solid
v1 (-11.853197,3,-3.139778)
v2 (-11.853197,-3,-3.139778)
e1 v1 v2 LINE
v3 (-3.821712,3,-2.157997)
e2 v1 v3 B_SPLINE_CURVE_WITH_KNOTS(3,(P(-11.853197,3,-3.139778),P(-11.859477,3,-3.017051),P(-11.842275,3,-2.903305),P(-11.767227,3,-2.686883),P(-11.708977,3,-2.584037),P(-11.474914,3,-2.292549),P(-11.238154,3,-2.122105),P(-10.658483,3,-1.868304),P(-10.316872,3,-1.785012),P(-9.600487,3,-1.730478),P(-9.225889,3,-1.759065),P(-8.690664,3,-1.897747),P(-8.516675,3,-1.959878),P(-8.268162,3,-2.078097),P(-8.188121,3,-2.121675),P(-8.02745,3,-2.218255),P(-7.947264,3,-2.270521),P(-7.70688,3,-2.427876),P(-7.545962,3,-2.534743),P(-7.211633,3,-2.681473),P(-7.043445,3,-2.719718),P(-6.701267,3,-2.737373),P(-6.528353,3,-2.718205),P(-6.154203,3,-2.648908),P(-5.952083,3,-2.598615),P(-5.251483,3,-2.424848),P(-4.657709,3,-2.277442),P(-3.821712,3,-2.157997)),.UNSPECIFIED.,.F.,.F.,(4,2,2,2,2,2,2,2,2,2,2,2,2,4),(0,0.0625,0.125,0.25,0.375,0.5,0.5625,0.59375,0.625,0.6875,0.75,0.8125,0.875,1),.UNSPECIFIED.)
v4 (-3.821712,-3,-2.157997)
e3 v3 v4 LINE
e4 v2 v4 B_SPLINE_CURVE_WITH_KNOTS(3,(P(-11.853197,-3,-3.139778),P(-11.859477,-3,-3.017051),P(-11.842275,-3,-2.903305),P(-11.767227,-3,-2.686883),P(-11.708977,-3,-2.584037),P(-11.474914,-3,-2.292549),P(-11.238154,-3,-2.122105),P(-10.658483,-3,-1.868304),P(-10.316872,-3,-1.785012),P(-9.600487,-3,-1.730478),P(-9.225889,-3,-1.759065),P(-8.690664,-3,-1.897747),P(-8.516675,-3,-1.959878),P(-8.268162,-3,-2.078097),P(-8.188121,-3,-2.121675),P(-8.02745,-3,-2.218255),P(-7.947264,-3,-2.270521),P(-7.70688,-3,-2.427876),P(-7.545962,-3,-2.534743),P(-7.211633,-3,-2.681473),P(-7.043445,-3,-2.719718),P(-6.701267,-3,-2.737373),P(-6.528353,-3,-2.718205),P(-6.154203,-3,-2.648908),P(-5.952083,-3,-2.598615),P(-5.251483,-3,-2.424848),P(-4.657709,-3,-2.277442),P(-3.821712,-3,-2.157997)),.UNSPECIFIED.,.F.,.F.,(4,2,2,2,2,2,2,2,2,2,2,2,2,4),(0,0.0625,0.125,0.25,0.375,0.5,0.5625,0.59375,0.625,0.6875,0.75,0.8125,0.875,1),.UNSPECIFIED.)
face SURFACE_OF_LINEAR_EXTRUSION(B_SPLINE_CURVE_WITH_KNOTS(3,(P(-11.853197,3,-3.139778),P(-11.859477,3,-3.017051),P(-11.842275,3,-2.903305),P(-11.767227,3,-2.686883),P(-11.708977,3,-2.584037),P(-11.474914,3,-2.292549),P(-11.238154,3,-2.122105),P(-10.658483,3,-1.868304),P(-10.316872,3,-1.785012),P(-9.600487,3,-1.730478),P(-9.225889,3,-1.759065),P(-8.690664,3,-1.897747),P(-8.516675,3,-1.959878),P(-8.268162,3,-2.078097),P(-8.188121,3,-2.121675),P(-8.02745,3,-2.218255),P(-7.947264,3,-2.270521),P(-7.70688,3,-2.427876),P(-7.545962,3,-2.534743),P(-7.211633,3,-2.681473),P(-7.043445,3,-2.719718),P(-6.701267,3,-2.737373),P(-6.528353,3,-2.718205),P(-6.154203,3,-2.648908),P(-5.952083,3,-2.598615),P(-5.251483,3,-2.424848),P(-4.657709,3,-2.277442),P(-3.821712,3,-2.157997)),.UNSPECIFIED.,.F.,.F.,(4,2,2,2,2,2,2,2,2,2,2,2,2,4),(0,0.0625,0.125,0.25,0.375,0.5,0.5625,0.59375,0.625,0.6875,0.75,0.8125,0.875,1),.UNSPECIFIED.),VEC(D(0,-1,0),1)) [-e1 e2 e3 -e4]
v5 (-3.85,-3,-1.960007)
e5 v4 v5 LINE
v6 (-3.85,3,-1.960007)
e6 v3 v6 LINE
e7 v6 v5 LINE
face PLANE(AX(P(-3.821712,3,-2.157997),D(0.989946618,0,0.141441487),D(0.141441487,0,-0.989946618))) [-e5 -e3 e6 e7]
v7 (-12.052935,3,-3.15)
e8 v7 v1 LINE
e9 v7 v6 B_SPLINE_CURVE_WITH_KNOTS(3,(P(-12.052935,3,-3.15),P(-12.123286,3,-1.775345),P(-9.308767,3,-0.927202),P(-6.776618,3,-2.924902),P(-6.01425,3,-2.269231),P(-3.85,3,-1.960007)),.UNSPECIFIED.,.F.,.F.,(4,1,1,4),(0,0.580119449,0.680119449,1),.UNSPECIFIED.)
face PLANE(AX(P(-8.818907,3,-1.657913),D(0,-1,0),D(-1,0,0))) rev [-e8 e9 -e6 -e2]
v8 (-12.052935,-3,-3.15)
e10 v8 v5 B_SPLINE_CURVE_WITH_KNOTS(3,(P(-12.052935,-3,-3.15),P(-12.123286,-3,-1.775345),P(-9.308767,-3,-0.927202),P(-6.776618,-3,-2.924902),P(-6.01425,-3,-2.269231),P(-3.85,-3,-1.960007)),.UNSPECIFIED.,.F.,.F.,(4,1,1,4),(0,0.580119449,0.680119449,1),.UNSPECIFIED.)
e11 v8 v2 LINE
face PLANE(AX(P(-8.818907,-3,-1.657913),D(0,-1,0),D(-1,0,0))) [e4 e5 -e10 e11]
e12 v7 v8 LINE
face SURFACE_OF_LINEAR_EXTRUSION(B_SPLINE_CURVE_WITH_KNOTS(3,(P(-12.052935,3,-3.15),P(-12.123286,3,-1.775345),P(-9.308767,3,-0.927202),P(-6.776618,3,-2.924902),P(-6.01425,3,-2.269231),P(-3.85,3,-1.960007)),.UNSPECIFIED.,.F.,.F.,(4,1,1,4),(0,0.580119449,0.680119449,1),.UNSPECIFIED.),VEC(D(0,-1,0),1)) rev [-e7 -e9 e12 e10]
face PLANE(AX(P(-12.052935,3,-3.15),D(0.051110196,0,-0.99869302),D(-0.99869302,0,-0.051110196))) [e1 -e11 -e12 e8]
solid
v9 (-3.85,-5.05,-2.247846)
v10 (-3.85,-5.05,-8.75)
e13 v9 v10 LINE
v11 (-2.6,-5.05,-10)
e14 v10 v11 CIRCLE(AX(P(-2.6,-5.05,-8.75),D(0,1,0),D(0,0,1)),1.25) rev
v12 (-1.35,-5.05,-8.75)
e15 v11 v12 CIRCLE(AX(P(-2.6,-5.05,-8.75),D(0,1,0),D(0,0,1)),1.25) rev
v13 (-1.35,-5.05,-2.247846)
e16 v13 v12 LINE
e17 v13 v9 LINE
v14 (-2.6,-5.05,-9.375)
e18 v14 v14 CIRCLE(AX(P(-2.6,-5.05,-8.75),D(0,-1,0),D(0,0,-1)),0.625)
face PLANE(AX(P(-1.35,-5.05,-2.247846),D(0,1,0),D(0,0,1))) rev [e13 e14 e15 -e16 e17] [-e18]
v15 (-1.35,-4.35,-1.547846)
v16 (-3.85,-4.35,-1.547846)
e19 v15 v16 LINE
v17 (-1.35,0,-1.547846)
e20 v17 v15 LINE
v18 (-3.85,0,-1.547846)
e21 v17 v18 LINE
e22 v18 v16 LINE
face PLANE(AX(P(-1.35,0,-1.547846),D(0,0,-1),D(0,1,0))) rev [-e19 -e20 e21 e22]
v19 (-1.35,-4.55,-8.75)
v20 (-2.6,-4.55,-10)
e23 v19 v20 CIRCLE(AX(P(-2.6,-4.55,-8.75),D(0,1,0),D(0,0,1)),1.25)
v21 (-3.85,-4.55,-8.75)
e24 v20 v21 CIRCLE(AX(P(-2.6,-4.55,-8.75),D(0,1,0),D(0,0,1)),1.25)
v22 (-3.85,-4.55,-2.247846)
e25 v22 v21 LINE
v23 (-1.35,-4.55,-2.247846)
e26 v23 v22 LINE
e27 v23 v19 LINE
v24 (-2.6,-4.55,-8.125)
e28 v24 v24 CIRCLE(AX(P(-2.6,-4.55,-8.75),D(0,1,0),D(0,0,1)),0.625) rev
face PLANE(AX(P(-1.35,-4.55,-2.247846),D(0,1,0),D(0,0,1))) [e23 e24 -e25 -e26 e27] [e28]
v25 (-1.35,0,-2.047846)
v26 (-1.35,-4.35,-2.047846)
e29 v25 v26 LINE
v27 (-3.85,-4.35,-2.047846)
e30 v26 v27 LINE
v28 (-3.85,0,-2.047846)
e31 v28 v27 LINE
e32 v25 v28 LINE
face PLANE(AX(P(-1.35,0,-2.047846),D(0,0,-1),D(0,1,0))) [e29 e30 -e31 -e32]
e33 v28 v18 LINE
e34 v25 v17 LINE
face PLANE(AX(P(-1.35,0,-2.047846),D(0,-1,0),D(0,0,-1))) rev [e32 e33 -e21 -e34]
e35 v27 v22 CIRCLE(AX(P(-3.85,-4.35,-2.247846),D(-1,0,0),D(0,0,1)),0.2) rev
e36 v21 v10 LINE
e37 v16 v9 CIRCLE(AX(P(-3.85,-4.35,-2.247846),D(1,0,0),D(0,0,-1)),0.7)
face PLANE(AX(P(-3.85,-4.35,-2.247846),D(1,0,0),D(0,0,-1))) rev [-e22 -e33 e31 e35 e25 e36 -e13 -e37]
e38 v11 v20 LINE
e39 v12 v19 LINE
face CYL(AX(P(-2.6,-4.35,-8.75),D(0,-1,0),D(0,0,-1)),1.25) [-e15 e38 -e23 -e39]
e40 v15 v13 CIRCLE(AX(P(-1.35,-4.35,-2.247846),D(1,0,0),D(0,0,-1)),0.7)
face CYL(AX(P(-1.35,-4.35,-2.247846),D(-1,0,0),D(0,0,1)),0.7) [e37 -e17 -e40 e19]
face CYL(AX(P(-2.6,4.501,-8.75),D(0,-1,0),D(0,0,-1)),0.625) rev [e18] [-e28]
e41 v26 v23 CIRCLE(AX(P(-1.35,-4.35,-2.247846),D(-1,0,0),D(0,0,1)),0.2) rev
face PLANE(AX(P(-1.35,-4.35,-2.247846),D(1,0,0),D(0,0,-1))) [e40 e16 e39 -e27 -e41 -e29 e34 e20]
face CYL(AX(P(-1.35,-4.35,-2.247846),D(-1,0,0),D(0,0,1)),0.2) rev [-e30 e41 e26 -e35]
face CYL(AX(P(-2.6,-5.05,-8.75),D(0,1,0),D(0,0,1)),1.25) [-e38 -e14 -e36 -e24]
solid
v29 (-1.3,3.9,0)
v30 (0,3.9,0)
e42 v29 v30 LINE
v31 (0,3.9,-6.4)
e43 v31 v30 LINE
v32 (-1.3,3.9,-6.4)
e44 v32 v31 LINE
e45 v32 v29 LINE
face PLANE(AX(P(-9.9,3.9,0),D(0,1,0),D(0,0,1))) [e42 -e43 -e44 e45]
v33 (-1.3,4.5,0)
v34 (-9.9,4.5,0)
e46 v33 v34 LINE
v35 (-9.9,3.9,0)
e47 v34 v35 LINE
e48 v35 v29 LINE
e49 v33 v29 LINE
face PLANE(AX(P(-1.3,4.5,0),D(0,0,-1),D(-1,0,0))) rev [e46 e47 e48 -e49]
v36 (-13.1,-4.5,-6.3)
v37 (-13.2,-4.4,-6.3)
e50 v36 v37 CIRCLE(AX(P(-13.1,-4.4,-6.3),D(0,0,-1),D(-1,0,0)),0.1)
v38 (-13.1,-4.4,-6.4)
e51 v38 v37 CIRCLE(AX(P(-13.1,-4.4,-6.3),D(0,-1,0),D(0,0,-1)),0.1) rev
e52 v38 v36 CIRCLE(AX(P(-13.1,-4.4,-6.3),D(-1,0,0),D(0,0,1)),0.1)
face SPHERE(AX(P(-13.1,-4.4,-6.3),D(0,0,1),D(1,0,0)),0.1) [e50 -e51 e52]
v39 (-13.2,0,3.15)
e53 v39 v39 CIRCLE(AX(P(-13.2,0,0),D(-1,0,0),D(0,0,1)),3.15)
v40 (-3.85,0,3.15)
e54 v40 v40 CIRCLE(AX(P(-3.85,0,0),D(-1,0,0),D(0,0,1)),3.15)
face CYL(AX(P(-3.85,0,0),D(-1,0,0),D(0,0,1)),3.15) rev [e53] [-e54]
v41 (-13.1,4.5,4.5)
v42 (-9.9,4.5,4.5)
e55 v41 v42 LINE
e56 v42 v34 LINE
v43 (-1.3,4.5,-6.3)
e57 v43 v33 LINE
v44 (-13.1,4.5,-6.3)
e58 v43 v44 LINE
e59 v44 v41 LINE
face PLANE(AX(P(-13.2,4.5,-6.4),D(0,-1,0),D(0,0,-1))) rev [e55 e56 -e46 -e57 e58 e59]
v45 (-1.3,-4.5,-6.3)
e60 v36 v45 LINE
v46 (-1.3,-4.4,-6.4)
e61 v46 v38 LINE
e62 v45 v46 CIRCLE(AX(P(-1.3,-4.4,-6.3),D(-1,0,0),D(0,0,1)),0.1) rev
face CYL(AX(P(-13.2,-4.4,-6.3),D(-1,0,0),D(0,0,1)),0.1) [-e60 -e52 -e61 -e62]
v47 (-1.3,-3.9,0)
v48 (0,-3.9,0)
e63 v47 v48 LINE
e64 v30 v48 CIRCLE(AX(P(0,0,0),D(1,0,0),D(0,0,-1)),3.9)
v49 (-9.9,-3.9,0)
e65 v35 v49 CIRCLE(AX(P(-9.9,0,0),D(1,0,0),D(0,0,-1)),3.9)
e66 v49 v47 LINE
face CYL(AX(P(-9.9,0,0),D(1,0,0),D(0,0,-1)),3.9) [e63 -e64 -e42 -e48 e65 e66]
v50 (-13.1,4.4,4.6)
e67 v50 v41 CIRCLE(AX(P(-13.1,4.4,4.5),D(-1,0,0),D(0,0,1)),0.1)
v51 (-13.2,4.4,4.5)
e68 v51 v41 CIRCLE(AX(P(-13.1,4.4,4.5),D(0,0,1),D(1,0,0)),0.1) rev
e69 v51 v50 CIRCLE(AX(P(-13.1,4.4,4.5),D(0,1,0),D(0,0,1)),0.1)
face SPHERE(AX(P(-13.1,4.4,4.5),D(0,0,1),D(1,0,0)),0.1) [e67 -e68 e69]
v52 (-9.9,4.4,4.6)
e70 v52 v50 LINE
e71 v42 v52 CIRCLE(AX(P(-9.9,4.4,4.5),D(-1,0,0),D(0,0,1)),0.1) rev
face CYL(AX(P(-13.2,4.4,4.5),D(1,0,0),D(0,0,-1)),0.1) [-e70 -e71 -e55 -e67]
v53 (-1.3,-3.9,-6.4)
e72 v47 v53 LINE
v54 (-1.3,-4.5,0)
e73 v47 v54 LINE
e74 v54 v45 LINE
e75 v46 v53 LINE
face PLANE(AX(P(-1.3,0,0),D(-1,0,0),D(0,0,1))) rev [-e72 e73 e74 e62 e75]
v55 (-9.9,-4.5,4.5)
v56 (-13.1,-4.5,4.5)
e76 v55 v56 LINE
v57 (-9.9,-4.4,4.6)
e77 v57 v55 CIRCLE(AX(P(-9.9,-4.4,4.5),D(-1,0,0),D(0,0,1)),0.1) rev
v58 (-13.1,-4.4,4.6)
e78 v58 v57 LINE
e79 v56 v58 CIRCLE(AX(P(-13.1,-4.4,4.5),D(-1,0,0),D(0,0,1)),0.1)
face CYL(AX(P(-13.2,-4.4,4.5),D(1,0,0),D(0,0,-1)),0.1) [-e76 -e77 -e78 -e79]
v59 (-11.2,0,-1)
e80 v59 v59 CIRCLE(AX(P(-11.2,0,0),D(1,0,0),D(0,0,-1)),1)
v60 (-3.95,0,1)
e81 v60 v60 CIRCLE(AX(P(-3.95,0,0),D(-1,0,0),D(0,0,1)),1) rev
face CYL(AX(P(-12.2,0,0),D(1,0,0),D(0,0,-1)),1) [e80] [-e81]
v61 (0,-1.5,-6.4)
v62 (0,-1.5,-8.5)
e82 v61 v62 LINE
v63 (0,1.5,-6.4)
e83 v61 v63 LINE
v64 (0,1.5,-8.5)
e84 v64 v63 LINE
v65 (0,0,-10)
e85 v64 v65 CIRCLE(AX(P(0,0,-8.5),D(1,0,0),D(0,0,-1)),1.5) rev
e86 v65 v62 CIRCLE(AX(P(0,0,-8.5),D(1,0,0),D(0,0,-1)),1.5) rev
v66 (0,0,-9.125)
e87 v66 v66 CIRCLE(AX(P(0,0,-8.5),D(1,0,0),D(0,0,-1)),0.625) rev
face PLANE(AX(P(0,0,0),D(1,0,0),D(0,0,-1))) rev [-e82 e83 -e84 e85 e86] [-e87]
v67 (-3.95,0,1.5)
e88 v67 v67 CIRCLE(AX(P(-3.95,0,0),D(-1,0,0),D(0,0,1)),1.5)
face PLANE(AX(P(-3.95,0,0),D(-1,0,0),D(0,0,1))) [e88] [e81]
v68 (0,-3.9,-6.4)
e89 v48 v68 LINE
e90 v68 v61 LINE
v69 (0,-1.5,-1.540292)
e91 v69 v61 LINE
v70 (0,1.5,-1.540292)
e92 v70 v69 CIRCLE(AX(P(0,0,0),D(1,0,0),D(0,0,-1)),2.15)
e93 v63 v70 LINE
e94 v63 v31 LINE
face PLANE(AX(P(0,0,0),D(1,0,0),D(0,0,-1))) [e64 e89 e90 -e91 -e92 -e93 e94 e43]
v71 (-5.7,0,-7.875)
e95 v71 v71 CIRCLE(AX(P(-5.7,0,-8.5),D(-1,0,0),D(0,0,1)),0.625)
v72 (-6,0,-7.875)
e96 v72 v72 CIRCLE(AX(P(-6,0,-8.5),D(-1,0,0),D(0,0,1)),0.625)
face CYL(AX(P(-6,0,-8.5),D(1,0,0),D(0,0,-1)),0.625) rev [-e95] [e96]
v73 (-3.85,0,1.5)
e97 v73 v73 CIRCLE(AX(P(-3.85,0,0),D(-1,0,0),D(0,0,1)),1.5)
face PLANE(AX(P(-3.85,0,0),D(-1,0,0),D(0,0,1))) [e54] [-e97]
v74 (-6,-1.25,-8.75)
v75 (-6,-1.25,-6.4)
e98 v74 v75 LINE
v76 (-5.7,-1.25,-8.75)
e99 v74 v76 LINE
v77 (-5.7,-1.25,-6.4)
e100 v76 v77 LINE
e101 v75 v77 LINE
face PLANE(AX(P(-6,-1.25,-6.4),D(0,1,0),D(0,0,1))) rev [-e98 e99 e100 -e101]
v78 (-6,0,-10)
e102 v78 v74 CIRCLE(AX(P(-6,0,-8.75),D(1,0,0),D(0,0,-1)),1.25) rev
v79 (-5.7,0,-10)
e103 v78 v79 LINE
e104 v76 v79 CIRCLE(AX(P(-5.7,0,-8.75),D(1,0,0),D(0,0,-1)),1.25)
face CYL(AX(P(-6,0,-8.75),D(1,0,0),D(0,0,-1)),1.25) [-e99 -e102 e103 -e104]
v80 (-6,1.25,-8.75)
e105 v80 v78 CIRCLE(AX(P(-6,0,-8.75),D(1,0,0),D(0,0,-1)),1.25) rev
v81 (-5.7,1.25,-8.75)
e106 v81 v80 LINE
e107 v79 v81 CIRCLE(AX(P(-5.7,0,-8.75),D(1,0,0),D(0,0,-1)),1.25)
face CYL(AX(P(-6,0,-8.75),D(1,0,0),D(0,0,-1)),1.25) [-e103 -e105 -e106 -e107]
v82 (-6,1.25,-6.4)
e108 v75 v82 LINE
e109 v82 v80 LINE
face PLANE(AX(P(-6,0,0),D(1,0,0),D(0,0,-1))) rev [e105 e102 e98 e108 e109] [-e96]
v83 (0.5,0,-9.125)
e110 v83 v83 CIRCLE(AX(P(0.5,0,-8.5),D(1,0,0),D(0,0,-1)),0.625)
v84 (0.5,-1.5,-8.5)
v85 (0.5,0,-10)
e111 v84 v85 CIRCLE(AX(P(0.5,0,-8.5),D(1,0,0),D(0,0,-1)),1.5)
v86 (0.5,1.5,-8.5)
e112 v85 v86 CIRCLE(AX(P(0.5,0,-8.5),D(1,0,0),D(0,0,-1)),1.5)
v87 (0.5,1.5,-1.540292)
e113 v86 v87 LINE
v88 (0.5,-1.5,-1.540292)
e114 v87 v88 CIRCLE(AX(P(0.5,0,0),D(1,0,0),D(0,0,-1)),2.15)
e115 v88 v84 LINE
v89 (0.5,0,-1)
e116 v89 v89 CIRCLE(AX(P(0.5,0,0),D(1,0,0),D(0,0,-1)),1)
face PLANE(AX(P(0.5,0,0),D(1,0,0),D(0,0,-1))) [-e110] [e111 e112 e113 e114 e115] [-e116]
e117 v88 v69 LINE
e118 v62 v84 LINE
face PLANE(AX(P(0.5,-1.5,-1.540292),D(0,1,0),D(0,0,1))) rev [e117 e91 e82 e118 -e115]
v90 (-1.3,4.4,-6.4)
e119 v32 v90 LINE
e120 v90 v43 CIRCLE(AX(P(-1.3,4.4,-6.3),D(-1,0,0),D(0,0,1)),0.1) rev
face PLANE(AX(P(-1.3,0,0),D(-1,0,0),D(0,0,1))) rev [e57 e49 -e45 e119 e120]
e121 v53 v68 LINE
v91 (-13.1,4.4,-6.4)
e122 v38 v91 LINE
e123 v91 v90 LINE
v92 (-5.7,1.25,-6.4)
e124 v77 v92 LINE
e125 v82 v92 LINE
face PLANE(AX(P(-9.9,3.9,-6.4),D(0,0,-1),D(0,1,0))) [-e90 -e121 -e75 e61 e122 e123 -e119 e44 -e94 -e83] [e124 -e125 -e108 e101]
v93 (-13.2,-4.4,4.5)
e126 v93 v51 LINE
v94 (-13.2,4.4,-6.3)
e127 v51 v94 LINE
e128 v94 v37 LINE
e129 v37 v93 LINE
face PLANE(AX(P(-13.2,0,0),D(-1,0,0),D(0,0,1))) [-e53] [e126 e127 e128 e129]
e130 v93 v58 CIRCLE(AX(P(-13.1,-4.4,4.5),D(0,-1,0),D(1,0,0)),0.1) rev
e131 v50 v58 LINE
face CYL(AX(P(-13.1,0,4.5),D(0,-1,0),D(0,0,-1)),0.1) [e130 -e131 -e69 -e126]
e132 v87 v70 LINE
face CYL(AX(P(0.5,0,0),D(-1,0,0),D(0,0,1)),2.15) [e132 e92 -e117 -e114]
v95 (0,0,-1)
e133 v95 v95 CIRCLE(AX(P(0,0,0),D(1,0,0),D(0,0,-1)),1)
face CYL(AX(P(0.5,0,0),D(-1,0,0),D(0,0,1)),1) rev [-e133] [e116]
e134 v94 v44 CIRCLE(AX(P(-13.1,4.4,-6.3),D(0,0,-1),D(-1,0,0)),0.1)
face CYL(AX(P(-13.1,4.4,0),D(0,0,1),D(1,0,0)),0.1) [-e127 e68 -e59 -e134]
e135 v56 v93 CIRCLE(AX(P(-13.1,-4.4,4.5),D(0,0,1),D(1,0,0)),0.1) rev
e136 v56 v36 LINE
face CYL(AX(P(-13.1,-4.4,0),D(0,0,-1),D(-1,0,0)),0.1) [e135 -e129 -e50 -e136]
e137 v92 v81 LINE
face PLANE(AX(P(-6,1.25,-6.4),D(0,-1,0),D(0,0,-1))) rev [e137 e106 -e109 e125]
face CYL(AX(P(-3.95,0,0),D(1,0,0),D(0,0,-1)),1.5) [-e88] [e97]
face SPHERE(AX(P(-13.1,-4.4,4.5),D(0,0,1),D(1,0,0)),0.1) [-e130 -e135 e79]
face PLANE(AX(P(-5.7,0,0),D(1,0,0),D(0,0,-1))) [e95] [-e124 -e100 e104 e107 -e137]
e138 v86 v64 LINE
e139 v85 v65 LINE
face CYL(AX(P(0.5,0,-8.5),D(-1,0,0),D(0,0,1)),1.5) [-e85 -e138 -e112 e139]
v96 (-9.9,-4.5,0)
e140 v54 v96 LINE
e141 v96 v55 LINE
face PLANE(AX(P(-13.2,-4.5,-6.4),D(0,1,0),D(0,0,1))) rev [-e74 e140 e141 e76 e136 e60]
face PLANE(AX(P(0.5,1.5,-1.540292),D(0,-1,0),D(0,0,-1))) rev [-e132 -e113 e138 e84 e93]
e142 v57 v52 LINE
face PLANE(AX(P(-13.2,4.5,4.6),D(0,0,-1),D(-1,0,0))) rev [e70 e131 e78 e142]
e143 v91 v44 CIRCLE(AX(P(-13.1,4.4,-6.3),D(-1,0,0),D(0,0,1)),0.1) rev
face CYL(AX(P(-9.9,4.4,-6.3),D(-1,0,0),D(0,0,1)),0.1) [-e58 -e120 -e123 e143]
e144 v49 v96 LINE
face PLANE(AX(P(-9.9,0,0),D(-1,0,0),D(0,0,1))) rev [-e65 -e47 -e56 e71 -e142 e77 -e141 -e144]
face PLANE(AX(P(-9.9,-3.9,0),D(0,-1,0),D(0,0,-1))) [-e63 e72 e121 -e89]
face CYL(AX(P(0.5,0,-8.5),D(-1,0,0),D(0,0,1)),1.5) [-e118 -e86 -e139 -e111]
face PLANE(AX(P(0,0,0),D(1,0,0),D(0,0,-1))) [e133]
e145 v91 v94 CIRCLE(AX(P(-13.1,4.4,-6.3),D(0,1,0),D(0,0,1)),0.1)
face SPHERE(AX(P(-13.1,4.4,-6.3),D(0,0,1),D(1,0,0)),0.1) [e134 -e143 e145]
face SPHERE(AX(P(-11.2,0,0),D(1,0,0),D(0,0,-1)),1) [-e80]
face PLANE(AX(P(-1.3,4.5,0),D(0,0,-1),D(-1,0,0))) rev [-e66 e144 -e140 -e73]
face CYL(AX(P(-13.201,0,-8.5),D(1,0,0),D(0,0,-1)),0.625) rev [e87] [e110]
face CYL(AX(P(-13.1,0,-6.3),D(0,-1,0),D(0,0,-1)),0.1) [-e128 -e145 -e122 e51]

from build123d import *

# Parameters (mm, degrees)
BOSS_EXTRUDE2_DEPTH = 9.9
SKETCH2_W           = 11
SKETCH2_H           = 9
BOSS_EXTRUDE3_DEPTH = 3.3
SKETCH4_W           = 6.4
SKETCH4_H           = 9
BOSS_EXTRUDE4_DEPTH = 8.6
SKETCH3_R           = 3.15
CUT_EXTRUDE1_DEPTH  = 9.35
SKETCH6_R           = 1.5
BOSS_EXTRUDE6_DEPTH = 0.1
SKETCH5_R           = 1
BOSS_EXTRUDE5_DEPTH = 8.35
FILLET1_R           = 1
EXTRUDE_THIN2_START = -3
EXTRUDE_THIN2_DEPTH = 6
EXTRUDE_THIN3_DEPTH = 2.5
FILLET2_R           = 1.25
SKETCH9_R           = 0.625
CUT_EXTRUDE2_DEPTH  = 0.5
BOSS_EXTRUDE7_START = 0.5
SKETCH10_R          = 1
BOSS_EXTRUDE7_DEPTH = 0.5
FILLET3_R           = 1.5
SKETCH12_R          = 0.625
CUT_EXTRUDE3_DEPTH  = 0.5
SKETCH13_W          = 3.6
SKETCH13_H          = 2.5
SKETCH13_R          = 0.625
BOSS_EXTRUDE8_DEPTH = 0.15
FILLET4_R           = 1.25
FILLET5_R           = 0.1


# Read off the part's stored shape, not the designer's step: Extrude-Thin2
with BuildPart() as part:
    # Sketch1 → Boss-Extrude2 (new body)
    with BuildSketch(Plane(origin=(0, 0, 0), x_dir=(0, 0, -1), z_dir=(1, 0, 0))):
        with BuildLine():
            Line((0, 3.9), (6.4, 3.9))
            Line((6.4, 3.9), (6.4, -3.9))
            Line((6.4, -3.9), (0, -3.9))
            ThreePointArc((0, -3.9), (-3.9, 0), (0, 3.9))
        make_face()
    extrude(amount=-BOSS_EXTRUDE2_DEPTH)

    # Sketch2 → Boss-Extrude3 (add)
    with BuildSketch(Plane.ZY.offset(9.9)):
        with Locations((-0.9, 0)):
            Rectangle(SKETCH2_W, SKETCH2_H)
    extrude(amount=BOSS_EXTRUDE3_DEPTH)

    # Sketch4 → Boss-Extrude4 (add)
    with BuildSketch(Plane(origin=(-9.9, 0, 0), x_dir=(0, 0, -1), z_dir=(1, 0, 0))):
        with Locations((3.2, 0)):
            Rectangle(SKETCH4_W, SKETCH4_H)
    extrude(amount=BOSS_EXTRUDE4_DEPTH)

    # Sketch3 → Cut-Extrude1 (cut)
    with BuildSketch(Plane.ZY.offset(13.2)):
        Circle(SKETCH3_R)
    extrude(amount=-CUT_EXTRUDE1_DEPTH, mode=Mode.SUBTRACT)

    # Sketch6 → Boss-Extrude6 (add)
    with BuildSketch(Plane.ZY.offset(3.85)):
        Circle(SKETCH6_R)
    extrude(amount=BOSS_EXTRUDE6_DEPTH)

    # Sketch5 → Boss-Extrude5 (add)
    with BuildSketch(Plane.ZY.offset(3.85)):
        Circle(SKETCH5_R)
    extrude(amount=BOSS_EXTRUDE5_DEPTH)

    # Fillet1
    fillet1_edges = [part.edges().sort_by_distance(p)[0] for p in [
        (-12.2, 0, -1),
    ]]
    fillet(fillet1_edges, radius=FILLET1_R)

    # Sketch10 → Boss-Extrude7 (add)
    with BuildSketch(Plane(origin=(0, 0, 0), x_dir=(0, 0, -1), z_dir=(1, 0, 0)).offset(BOSS_EXTRUDE7_START)):
        with BuildLine():
            Line((1.54029218, -1.5), (10, -1.5))
            Line((10, -1.5), (10, 1.5))
            Line((10, 1.5), (1.54029218, 1.5))
            ThreePointArc((1.54029218, 1.5), (-2.15, 0), (1.54029218, -1.5))
        make_face()
        Circle(SKETCH10_R, mode=Mode.SUBTRACT)
    extrude(amount=-BOSS_EXTRUDE7_DEPTH)

    # Fillet3
    fillet3_edges = [part.edges().sort_by_distance(p)[0] for p in [
        (0.25, 1.5, -10),
        (0.25, -1.5, -10),
    ]]
    fillet(fillet3_edges, radius=FILLET3_R - 0.0001)  # a hair under: the kernel refuses the full size

    # Sketch12 → Cut-Extrude3 (cut)
    with BuildSketch(Plane(origin=(0.5, 0, 0), x_dir=(0, 0, -1), z_dir=(1, 0, 0))):
        with Locations((8.5, 0)):
            Circle(SKETCH12_R)
    extrude(amount=-CUT_EXTRUDE3_DEPTH, mode=Mode.SUBTRACT)

    # Sketch13 → Boss-Extrude8 (add, symmetric)
    with BuildSketch(Plane.ZY.offset(5.85)):
        with Locations((-8.2, 0)):
            Rectangle(SKETCH13_W, SKETCH13_H)
        with Locations(Location((-8.5, 0, 0), (0, 0, 180))):
            Circle(SKETCH13_R, mode=Mode.SUBTRACT)
    extrude(amount=BOSS_EXTRUDE8_DEPTH, both=True)

    # Fillet4
    fillet4_edges = [part.edges().sort_by_distance(p)[0] for p in [
        (-5.85, -1.25, -10),
        (-5.85, 1.25, -10),
    ]]
    fillet(fillet4_edges, radius=FILLET4_R - 0.0001)  # a hair under: the kernel refuses the full size

    # Fillet5
    fillet5_edges = [part.edges().sort_by_distance(p)[0] for p in [
        (-7.25, 4.5, -6.4),
        (-7.25, -4.5, -6.4),
        (-11.55, -4.5, 4.6),
        (-11.55, 4.5, 4.6),
        (-13.2, 0, -6.4),
        (-13.2, -4.5, -0.9),
        (-13.2, 0, 4.6),
        (-13.2, 4.5, -0.9),
    ]]
    fillet(fillet5_edges, radius=FILLET5_R)


with BuildPart() as body_2:
    # Extrude-Thin2 outline → Extrude-Thin2 (new body)
    with BuildSketch(Plane(origin=(0, 0, 0), x_dir=(1, 0, 0), z_dir=(0, 1, 0)).offset(EXTRUDE_THIN2_START)):
        with BuildLine():
            Line((-11.853196595, 3.139777961), (-12.052935199, 3.15))
            add(Edge.make_bspline(
                [(-12.052935199, 3.15), (-12.123286013, 1.775345384), (-9.308767384, 0.927202084), (-6.776618422, 2.924902189), (-6.014250042, 2.269230668), (-3.85, 1.960007182)],
                knots=[0, 0, 0, 0, 0.580119449, 0.680119449, 1, 1, 1, 1], degree=3))
            Line((-3.85, 1.960007182), (-3.821711703, 2.157996506))
            add(Edge.make_bspline(
                [(-11.853196595, 3.139777961), (-11.859477381, 3.017051446), (-11.842274614, 2.903305258), (-11.767226527, 2.686882966), (-11.708977162, 2.584036538), (-11.474913838, 2.292548546), (-11.238154332, 2.122105065), (-10.658483363, 1.868304427), (-10.316871729, 1.785011506), (-9.600487173, 1.730478033), (-9.225888583, 1.759065261), (-8.690663906, 1.897746504), (-8.516675338, 1.959877984), (-8.268161931, 2.078097128), (-8.188121436, 2.121674951), (-8.027449957, 2.218254569), (-7.947264051, 2.270521048), (-7.706879907, 2.427876211), (-7.545961857, 2.534742937), (-7.21163312, 2.681472678), (-7.043445259, 2.719717739), (-6.7012668, 2.737373448), (-6.528353372, 2.718205464), (-6.15420317, 2.648908427), (-5.952082723, 2.598615188), (-5.251482723, 2.424847742), (-4.657709278, 2.277442078), (-3.821711703, 2.157996506)],
                knots=[0, 0, 0, 0, 0.0625, 0.0625, 0.125, 0.125, 0.25, 0.25, 0.375, 0.375, 0.5, 0.5, 0.5625, 0.5625, 0.59375, 0.59375, 0.625, 0.625, 0.6875, 0.6875, 0.75, 0.75, 0.8125, 0.8125, 0.875, 0.875, 1, 1, 1, 1], degree=3))
        make_face()
    extrude(amount=EXTRUDE_THIN2_DEPTH)


with BuildPart() as body_3:
    # Sketch8 → Extrude-Thin3 (new body)
    with BuildSketch(Plane.ZY.offset(3.85)):
        with BuildLine():
            Line((-1.547846379, 0), (-1.547846379, -4.35))
            ThreePointArc((-1.547846379, -4.35), (-1.752871632, -4.844974747), (-2.247846379, -5.05))
            Line((-2.247846379, -5.05), (-10, -5.05))
            Line((-10, -5.05), (-10, -4.55))
            Line((-10, -4.55), (-2.247846379, -4.55))
            ThreePointArc((-2.247846379, -4.55), (-2.106425023, -4.491421356), (-2.047846379, -4.35))
            Line((-2.047846379, -4.35), (-2.047846379, 0))
            Line((-2.047846379, 0), (-1.547846379, 0))
        make_face()
    extrude(amount=-EXTRUDE_THIN3_DEPTH)

    # Fillet2
    fillet2_edges = [body_3.edges().sort_by_distance(p)[0] for p in [
        (-1.35, -4.8, -10),
        (-3.85, -4.8, -10),
    ]]
    fillet(fillet2_edges, radius=FILLET2_R - 0.0001)  # a hair under: the kernel refuses the full size

    # Sketch9 → Cut-Extrude2 (cut)
    with BuildSketch(Plane.XZ.offset(5.05)):
        with Locations(Location((-2.6, -8.75, 0), (0, 0, 270))):
            Circle(SKETCH9_R)
    extrude(amount=-CUT_EXTRUDE2_DEPTH, mode=Mode.SUBTRACT)


solid = Compound([part.part, body_2.part, body_3.part])
